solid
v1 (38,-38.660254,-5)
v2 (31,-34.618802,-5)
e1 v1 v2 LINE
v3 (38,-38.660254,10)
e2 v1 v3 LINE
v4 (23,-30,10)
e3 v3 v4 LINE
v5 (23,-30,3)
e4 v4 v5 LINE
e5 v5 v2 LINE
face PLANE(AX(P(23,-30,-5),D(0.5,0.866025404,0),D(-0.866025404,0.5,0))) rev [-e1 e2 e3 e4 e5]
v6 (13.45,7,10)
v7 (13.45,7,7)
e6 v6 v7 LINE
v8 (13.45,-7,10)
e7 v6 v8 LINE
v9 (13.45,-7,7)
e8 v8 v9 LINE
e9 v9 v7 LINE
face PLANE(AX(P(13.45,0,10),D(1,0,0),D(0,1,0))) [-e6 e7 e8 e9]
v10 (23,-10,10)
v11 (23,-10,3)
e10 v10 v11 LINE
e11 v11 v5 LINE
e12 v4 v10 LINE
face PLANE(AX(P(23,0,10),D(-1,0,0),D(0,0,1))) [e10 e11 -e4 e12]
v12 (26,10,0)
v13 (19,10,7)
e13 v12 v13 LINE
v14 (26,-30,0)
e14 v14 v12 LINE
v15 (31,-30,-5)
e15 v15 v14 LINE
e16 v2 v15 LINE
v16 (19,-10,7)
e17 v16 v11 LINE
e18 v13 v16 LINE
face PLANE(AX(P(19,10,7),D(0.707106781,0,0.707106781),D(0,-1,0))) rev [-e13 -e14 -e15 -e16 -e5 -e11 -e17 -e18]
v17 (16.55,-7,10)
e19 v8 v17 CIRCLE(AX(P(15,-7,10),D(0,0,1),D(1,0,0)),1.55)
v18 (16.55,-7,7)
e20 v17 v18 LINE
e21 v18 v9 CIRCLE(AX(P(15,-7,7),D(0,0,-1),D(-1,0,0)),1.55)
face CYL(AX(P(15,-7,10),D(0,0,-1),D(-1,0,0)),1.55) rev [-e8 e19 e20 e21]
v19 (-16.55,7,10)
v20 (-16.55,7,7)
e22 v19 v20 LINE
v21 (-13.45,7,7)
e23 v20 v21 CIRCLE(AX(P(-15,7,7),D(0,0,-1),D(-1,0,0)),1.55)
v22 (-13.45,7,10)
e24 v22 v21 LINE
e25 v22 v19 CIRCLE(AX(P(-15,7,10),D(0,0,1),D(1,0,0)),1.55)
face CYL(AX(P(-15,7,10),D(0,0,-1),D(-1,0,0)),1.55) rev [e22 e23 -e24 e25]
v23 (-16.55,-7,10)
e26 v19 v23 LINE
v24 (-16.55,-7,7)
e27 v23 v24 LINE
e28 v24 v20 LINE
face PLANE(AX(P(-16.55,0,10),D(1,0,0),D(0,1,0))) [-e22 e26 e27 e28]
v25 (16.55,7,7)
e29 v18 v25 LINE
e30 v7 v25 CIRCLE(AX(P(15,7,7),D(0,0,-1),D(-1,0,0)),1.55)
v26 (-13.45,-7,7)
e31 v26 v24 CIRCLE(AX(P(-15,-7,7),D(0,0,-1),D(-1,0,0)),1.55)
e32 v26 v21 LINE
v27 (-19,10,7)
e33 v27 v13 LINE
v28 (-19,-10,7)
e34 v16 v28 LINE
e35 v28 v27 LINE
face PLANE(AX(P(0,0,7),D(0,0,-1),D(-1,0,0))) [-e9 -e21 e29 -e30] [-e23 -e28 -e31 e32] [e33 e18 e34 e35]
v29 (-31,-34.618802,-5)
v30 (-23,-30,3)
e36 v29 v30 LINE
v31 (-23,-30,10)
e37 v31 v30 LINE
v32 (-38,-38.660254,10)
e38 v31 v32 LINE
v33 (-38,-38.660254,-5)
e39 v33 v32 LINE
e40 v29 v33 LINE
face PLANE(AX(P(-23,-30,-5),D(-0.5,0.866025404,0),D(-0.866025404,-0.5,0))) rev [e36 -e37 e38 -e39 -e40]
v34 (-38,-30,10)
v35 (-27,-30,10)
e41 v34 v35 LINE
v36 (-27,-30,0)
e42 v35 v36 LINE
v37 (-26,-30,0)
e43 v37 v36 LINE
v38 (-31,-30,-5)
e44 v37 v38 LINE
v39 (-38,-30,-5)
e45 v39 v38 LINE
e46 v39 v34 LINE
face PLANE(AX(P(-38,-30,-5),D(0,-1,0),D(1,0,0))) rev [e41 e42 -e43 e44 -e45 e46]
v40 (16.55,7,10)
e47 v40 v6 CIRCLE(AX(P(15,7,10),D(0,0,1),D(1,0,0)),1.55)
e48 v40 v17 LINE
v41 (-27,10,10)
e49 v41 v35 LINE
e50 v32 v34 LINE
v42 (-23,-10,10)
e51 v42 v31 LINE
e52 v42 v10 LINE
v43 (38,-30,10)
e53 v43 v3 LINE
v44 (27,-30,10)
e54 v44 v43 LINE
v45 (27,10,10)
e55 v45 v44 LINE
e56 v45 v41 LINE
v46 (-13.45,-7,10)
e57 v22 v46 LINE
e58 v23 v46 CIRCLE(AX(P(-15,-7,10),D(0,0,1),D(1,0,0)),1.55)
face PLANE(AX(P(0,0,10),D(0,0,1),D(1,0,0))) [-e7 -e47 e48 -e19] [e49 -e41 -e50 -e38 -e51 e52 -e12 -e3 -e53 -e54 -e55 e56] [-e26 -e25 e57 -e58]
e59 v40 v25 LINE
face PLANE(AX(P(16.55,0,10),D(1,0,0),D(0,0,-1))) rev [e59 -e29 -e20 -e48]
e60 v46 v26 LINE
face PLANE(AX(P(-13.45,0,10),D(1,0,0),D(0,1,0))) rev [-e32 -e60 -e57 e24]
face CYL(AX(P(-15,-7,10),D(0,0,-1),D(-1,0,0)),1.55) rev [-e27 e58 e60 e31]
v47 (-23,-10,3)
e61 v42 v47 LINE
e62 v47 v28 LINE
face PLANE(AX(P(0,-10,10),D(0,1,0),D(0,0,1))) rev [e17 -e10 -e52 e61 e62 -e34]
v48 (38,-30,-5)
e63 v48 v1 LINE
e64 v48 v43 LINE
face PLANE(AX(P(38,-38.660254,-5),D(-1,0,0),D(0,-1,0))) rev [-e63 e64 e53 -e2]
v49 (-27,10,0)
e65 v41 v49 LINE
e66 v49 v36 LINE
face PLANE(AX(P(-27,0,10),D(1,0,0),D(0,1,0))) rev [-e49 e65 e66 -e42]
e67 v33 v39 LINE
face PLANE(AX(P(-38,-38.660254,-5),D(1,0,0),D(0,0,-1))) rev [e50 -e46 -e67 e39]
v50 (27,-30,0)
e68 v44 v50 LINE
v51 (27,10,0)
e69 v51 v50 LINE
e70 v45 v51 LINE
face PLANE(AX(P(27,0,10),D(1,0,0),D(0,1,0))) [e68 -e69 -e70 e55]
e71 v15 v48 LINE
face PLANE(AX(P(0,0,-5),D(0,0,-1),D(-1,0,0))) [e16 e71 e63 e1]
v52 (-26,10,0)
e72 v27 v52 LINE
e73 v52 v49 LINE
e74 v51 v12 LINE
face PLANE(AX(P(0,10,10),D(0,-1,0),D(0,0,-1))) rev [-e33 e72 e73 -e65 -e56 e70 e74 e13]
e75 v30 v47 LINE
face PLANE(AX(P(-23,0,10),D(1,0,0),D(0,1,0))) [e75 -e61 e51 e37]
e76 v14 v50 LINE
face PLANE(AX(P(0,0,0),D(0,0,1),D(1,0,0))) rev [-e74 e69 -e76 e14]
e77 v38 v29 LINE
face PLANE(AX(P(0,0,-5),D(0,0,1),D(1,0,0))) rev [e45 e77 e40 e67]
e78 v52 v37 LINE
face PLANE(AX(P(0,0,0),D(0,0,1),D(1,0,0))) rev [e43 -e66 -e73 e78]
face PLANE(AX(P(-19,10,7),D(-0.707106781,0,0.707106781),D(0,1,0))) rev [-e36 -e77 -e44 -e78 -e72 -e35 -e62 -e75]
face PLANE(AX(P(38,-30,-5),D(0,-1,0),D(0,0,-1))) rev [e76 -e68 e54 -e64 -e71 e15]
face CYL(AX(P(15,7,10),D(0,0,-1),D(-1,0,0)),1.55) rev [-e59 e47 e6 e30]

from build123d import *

# Parameters (mm, degrees)
SKETCH1_W                = 46
SKETCH1_H                = 20
BOSS_EXTRUDE1_DEPTH      = 10
BOSS_EXTRUDE2_DEPTH      = 5
BOSS_EXTRUDE2_DEPTH_BACK = 10
SKETCH3_W                = 38
SKETCH3_H                = 20
CUT_EXTRUDE1_DEPTH       = 7
CHAMFER1_START           = -38.660254038
CHAMFER1_DEPTH           = 48.660254038


with BuildPart() as part:
    # Sketch1 → Boss-Extrude1 (new body)
    # profile 1 of 3: a face of its own
    with BuildSketch(Plane.XY):
        Rectangle(SKETCH1_W, SKETCH1_H)
        with BuildLine():
            Line((-13.45, 7), (-13.45, 0))
            Line((-13.45, 0), (-13.45, -7))
            ThreePointArc((-13.45, -7), (-15, -8.55), (-16.55, -7))
            Line((-16.55, -7), (-16.55, -2.8e-08))
            Line((-16.55, -2.8e-08), (-16.55, 7))
            ThreePointArc((-16.55, 7), (-15, 8.55), (-13.45, 7))
        make_face(mode=Mode.SUBTRACT)
        with BuildLine():
            Line((13.45, -7), (13.45, -7e-09))
            Line((13.45, -7e-09), (13.45, 7))
            ThreePointArc((13.45, 7), (15, 8.55), (16.55, 7))
            Line((16.55, 7), (16.55, 0))
            Line((16.55, 0), (16.55, -7))
            ThreePointArc((16.55, -7), (15, -8.55), (13.45, -7))
        make_face(mode=Mode.SUBTRACT)
    # profile 2 of 3: a face of its own
    with BuildSketch(Plane.XY):
        Polygon((-23, -30), (-23, -10), (-23, 10), (-27, 10), (-27, -30), align=None)
    # profile 3 of 3: a face of its own
    with BuildSketch(Plane.XY):
        Polygon((23, 10), (23, -10), (23, -30), (27, -30), (27, 10), align=None)
    extrude(amount=BOSS_EXTRUDE1_DEPTH)

    # Sketch2 → Boss-Extrude2 (add, two sides: drawn at the far end of the back side and taken through both)
    with BuildSketch(Plane(origin=(0, 0, 0), x_dir=(-1, 0, 0), z_dir=(0, 0, -1)).offset(-BOSS_EXTRUDE2_DEPTH_BACK)):
        Polygon((-23, -30), (-38, -38.660254038), (-38, -30), align=None)
        Polygon((23, -30), (38, -38.660254038), (38, -30), align=None)
    extrude(amount=BOSS_EXTRUDE2_DEPTH + BOSS_EXTRUDE2_DEPTH_BACK)

    # Sketch3 → Cut-Extrude1 (cut)
    with BuildSketch(Plane(origin=(0, 0, 0), x_dir=(-1, 0, 0), z_dir=(0, 0, -1))):
        Rectangle(SKETCH3_W, SKETCH3_H)
    extrude(amount=-CUT_EXTRUDE1_DEPTH, mode=Mode.SUBTRACT)

    # Chamfer1: read off the stored shape, not the designer's step
    # Chamfer1 outline → Chamfer1 (cut)
    with BuildSketch(Plane(origin=(0, 0, 0), x_dir=(1, 0, 0), z_dir=(0, 1, 0)).offset(CHAMFER1_START)):
        Polygon((-23, 5), (-31, 5), (-19, -7), (-19, 0), (-23, 0), align=None)
        Polygon((31, 5), (23, 5), (23, 0), (19, 0), (19, -7), align=None)
    extrude(amount=CHAMFER1_DEPTH, mode=Mode.SUBTRACT)


solid = part.part
